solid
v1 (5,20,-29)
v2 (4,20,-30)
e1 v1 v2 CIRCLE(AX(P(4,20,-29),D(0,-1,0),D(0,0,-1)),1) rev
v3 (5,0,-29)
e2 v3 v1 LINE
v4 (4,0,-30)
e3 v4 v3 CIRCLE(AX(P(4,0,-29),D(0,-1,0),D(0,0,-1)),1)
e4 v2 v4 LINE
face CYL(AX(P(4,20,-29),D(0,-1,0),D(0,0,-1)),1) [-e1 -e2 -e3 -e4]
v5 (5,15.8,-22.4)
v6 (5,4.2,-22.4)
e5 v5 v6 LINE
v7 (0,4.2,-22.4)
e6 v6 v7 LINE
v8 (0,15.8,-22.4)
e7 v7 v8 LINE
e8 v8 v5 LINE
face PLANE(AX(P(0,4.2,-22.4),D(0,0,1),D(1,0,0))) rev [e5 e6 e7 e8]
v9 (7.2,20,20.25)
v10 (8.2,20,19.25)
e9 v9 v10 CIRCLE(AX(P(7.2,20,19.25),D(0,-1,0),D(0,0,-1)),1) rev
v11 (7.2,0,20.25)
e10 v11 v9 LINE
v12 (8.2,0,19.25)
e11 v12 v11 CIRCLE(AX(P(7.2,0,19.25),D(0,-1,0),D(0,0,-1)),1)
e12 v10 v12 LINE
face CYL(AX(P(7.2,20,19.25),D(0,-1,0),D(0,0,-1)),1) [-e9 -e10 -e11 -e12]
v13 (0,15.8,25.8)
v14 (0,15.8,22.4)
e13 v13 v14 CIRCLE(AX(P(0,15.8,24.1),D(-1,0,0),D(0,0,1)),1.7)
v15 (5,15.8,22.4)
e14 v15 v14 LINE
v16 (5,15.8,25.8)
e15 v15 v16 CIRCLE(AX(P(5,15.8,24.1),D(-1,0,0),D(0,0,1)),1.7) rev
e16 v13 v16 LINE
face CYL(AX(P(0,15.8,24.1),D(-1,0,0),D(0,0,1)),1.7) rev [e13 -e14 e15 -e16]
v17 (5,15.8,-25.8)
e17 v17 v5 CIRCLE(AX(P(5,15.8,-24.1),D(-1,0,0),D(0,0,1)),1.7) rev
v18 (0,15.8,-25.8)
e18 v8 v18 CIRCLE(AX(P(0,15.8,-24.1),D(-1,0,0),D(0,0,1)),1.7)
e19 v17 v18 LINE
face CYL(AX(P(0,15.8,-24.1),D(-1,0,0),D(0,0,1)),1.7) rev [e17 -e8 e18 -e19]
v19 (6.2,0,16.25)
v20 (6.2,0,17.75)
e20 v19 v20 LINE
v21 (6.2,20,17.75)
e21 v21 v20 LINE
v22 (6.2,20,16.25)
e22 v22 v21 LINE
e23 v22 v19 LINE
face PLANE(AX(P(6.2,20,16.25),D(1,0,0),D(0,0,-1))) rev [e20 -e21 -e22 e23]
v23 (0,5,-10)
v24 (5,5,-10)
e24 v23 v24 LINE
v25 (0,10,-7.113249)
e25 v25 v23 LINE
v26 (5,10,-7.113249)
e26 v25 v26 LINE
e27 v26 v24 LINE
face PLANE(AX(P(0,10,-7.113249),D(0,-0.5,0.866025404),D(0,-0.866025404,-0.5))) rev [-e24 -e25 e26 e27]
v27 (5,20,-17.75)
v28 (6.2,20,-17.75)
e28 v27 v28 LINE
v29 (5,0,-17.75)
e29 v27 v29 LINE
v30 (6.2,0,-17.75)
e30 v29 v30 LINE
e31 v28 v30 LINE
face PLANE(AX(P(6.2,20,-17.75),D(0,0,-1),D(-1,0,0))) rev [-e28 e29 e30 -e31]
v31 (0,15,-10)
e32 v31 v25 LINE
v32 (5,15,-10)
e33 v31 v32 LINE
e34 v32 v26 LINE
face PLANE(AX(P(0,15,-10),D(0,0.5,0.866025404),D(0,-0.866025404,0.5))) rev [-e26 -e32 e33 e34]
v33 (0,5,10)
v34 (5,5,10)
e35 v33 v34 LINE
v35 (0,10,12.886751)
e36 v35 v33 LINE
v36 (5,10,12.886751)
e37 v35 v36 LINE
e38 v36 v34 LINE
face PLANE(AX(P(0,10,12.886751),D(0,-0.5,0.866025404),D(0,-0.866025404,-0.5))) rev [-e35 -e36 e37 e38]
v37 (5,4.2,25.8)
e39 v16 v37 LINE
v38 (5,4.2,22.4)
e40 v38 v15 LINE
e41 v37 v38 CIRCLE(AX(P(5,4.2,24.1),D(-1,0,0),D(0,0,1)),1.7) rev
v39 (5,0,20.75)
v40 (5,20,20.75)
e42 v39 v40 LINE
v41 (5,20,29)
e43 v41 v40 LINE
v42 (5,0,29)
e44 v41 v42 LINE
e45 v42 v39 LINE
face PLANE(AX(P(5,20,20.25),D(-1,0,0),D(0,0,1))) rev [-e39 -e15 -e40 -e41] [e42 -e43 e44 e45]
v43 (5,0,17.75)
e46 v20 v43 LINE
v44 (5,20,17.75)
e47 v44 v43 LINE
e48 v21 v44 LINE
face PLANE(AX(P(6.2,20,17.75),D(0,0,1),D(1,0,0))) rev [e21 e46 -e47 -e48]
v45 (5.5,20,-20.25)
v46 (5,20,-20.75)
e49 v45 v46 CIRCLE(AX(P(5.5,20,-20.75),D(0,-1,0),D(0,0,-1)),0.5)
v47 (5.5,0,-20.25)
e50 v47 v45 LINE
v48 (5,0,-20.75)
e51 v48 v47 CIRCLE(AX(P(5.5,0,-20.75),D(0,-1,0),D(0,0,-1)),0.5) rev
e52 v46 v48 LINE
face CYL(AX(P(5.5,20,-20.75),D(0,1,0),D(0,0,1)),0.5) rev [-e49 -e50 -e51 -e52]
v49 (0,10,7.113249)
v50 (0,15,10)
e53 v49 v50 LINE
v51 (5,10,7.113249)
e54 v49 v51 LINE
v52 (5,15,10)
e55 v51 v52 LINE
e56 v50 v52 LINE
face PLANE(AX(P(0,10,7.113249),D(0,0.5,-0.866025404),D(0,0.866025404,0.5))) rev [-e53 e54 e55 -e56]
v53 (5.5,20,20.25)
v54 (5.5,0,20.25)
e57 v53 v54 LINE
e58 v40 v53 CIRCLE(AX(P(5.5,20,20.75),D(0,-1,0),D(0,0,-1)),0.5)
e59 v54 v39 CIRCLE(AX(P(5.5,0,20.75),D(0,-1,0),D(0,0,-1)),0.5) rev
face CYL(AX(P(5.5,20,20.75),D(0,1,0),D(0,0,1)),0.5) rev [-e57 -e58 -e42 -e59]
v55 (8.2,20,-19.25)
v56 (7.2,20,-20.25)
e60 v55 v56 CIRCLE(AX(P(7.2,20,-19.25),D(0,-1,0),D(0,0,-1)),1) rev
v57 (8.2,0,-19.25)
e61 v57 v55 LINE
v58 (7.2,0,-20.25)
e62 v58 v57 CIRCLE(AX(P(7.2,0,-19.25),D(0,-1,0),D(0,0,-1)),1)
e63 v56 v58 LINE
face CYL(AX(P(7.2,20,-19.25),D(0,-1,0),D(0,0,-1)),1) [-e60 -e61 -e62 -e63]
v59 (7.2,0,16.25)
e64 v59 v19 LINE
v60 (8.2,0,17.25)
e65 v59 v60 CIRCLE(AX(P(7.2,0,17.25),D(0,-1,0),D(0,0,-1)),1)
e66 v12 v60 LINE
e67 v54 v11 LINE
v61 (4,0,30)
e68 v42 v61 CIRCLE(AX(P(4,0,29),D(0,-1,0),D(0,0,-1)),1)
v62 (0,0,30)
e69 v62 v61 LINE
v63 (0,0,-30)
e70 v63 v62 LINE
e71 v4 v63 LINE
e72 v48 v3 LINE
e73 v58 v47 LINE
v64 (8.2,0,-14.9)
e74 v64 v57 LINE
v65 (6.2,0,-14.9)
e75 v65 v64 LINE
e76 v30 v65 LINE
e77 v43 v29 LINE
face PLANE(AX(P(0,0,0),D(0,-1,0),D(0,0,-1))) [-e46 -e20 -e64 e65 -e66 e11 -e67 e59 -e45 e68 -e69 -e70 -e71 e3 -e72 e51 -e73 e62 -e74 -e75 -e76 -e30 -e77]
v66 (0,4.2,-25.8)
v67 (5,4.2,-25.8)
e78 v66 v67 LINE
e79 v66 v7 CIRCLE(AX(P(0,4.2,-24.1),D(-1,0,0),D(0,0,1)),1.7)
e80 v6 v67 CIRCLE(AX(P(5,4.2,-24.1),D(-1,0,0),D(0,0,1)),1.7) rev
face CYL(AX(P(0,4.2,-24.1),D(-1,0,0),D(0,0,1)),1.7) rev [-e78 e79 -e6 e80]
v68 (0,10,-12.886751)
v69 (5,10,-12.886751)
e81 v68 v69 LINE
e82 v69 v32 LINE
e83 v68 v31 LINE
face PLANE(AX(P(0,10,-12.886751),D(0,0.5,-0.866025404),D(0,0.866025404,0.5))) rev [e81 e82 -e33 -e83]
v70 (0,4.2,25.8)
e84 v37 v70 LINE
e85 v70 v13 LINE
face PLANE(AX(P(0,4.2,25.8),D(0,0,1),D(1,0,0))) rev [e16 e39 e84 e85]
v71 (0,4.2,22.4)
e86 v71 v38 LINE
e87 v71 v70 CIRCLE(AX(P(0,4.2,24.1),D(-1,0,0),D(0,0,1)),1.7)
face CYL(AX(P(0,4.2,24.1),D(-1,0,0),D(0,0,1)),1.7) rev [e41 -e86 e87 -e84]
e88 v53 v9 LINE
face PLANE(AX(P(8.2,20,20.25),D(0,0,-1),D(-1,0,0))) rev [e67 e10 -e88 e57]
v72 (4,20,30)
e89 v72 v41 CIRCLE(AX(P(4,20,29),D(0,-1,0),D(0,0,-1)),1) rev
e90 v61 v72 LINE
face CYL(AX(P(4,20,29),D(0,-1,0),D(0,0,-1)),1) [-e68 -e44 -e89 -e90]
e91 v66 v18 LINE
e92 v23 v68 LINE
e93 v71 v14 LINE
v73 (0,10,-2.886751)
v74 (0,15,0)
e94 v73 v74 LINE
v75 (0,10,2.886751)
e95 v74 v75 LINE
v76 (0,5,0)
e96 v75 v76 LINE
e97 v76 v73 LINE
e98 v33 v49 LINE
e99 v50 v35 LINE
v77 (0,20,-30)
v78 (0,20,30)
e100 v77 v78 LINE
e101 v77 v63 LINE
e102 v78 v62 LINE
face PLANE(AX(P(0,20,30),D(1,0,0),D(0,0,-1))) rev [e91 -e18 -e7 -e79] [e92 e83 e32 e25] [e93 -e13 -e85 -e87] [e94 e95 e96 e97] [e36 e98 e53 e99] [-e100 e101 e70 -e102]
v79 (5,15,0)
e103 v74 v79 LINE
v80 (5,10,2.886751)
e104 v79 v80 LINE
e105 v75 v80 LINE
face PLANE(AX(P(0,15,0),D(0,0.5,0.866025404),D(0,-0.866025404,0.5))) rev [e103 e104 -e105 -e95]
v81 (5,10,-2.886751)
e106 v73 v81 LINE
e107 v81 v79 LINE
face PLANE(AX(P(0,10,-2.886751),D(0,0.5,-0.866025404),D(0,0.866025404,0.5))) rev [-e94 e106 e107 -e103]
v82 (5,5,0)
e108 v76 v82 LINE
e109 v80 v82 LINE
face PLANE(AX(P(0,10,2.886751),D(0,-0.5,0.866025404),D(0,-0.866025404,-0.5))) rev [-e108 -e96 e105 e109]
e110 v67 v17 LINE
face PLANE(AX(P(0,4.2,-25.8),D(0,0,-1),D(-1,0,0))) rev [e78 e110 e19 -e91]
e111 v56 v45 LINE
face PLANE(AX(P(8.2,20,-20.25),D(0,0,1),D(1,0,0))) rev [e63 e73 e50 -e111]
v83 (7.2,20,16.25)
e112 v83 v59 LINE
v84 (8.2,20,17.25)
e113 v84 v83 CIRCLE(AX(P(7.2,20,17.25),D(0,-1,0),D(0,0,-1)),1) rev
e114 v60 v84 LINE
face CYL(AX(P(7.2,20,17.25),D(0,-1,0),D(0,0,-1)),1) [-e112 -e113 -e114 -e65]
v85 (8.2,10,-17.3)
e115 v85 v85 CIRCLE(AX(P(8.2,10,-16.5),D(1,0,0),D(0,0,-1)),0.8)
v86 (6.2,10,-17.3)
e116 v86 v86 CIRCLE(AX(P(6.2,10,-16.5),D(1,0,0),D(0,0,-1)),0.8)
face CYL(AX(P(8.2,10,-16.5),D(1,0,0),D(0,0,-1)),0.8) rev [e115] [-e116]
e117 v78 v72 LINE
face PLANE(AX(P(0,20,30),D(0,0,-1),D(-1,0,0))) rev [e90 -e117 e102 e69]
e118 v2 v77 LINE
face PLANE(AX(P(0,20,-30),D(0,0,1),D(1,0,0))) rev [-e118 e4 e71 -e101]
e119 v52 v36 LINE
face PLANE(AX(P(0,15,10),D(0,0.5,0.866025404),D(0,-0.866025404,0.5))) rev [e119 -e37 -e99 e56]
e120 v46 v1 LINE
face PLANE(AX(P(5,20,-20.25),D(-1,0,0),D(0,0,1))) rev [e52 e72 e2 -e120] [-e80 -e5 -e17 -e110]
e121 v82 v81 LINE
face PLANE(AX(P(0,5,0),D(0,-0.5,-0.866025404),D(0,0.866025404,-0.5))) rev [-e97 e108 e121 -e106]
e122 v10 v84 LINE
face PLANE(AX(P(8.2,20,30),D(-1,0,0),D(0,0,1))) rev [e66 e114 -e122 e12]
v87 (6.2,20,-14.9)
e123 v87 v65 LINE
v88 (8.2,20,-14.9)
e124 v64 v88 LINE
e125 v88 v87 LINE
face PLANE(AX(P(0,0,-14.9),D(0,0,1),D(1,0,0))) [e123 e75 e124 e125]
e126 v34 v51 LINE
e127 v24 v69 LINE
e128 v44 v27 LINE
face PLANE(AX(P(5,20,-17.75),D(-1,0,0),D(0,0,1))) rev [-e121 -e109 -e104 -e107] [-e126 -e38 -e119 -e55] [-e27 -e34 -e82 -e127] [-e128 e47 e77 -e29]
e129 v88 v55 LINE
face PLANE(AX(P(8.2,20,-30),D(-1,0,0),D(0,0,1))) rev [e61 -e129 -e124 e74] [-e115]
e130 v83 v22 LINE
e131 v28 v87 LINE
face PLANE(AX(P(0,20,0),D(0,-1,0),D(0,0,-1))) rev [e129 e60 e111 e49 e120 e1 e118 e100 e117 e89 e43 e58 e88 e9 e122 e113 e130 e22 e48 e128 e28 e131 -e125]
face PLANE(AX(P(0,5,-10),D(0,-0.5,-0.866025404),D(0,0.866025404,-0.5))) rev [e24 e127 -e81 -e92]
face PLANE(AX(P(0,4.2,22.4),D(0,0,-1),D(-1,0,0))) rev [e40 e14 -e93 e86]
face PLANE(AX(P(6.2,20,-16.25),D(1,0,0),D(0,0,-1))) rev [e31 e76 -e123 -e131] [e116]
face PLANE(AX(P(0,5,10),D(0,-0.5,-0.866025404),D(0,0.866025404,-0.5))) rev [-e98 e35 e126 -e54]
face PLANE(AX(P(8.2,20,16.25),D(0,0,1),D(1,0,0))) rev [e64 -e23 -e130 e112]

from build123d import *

# Parameters (mm, degrees)
BOSS_EXTRUDE1_DEPTH       = 20
M3_CLEARANCE_SLOT1_DEPTH  = 8.2
SKETCH5_W                 = 3.2
SKETCH5_H                 = 9.75
CUT_EXTRUDE1_DEPTH        = 37.976208567
CUT_EXTRUDE2_DEPTH        = 37.400549446
LPATTERN1_COUNT           = 2
LPATTERN1_PITCH           = 10
LPATTERN2_COUNT           = 2
LPATTERN2_PITCH           = 10
FILLET2_R                 = 0.5
SKETCH9_W                 = 2
SKETCH9_H                 = 20
BOSS_EXTRUDE2_DEPTH       = 1.35
FILLET1_R                 = 1
M2X0_4_TAPPED_HOLE1_D     = 1.6
M2X0_4_TAPPED_HOLE1_DEPTH = 2


# Read off the part's stored shape, not the designer's step: M3 Clearance Slot1
with BuildPart() as part:
    # Sketch2 → Boss-Extrude1 (new body)
    with BuildSketch(Plane(origin=(0, 0, 0), x_dir=(1, 0, 0), z_dir=(0, 1, 0))):
        Polygon((0, -30), (0, 30), (8.2, 30), (8.2, 16.25), (6.2, 16.25), (6.2, 17.75), (5, 17.75), (5, -17.75), (6.2, -17.75), (6.2, -16.25), (8.2, -16.25), (8.2, -30), align=None)
    extrude(amount=BOSS_EXTRUDE1_DEPTH)

    # M3 Clearance Slot1 outline → M3 Clearance Slot1 (cut)
    with BuildSketch(Plane.YZ):
        with BuildLine():
            ThreePointArc((15.8, 22.4), (17.5, 24.1), (15.8, 25.8))
            Line((15.8, 25.8), (4.2, 25.8))
            ThreePointArc((4.2, 25.8), (2.5, 24.1), (4.2, 22.4))
            Line((4.2, 22.4), (15.8, 22.4))
        make_face()
        with BuildLine():
            ThreePointArc((15.8, -25.8), (17.5, -24.1), (15.8, -22.4))
            Line((15.8, -22.4), (4.2, -22.4))
            ThreePointArc((4.2, -22.4), (2.5, -24.1), (4.2, -25.8))
            Line((4.2, -25.8), (15.8, -25.8))
        make_face()
    extrude(amount=M3_CLEARANCE_SLOT1_DEPTH, mode=Mode.SUBTRACT)

    # Sketch5 → Cut-Extrude1 (cut, through all)
    with BuildSketch(Plane.XZ):
        with Locations((6.6, 25.125)):
            Rectangle(SKETCH5_W, SKETCH5_H)
        with Locations((6.6, -25.125)):
            Rectangle(SKETCH5_W, SKETCH5_H)
    extrude(amount=-CUT_EXTRUDE1_DEPTH, mode=Mode.SUBTRACT)

    # Sketch8 → Cut-Extrude2 (cut, through all)
    with BuildSketch(Plane(origin=(5, 0, 0), x_dir=(0, 0, -1), z_dir=(1, 0, 0))):
        Polygon((0, 5), (2.886751346, 10), (0, 15), (-2.886751346, 10), align=None)
    cut_extrude2 = extrude(amount=-CUT_EXTRUDE2_DEPTH, mode=Mode.SUBTRACT)

    # LPattern1: Cut-Extrude2 ×2
    with Locations(*[(0, 0, i * LPATTERN1_PITCH) for i in range(1, LPATTERN1_COUNT)]):
        add(cut_extrude2, mode=Mode.SUBTRACT)

    # LPattern2: Cut-Extrude2 ×2
    with Locations(*[(0, 0, -i * LPATTERN2_PITCH) for i in range(1, LPATTERN2_COUNT)]):
        add(cut_extrude2, mode=Mode.SUBTRACT)

    # Fillet2
    fillet2_edges = [part.edges().sort_by_distance(p)[0] for p in [
        (5, 10, 20.25),
        (5, 10, -20.25),
    ]]
    fillet(fillet2_edges, radius=FILLET2_R)

    # Sketch9 → Boss-Extrude2 (add)
    with BuildSketch(Plane.XY.offset(-16.25)):
        with Locations((7.2, 10)):
            Rectangle(SKETCH9_W, SKETCH9_H)
    extrude(amount=BOSS_EXTRUDE2_DEPTH)

    # Fillet1
    fillet1_edges = [part.edges().sort_by_distance(p)[0] for p in [
        (8.2, 10, 16.25),
        (8.2, 10, 20.25),
        (5, 10, 30),
        (8.2, 10, -20.25),
        (5, 10, -30),
    ]]
    fillet(fillet1_edges, radius=FILLET1_R)

    # M2x0.4 Tapped Hole1
    with Locations(Plane(origin=(8.2, 0, 0), x_dir=(0, 0, -1), z_dir=(1, 0, 0))):
        with Locations((16.5, 10)):
            Hole(M2X0_4_TAPPED_HOLE1_D / 2, depth=M2X0_4_TAPPED_HOLE1_DEPTH)


solid = part.part
